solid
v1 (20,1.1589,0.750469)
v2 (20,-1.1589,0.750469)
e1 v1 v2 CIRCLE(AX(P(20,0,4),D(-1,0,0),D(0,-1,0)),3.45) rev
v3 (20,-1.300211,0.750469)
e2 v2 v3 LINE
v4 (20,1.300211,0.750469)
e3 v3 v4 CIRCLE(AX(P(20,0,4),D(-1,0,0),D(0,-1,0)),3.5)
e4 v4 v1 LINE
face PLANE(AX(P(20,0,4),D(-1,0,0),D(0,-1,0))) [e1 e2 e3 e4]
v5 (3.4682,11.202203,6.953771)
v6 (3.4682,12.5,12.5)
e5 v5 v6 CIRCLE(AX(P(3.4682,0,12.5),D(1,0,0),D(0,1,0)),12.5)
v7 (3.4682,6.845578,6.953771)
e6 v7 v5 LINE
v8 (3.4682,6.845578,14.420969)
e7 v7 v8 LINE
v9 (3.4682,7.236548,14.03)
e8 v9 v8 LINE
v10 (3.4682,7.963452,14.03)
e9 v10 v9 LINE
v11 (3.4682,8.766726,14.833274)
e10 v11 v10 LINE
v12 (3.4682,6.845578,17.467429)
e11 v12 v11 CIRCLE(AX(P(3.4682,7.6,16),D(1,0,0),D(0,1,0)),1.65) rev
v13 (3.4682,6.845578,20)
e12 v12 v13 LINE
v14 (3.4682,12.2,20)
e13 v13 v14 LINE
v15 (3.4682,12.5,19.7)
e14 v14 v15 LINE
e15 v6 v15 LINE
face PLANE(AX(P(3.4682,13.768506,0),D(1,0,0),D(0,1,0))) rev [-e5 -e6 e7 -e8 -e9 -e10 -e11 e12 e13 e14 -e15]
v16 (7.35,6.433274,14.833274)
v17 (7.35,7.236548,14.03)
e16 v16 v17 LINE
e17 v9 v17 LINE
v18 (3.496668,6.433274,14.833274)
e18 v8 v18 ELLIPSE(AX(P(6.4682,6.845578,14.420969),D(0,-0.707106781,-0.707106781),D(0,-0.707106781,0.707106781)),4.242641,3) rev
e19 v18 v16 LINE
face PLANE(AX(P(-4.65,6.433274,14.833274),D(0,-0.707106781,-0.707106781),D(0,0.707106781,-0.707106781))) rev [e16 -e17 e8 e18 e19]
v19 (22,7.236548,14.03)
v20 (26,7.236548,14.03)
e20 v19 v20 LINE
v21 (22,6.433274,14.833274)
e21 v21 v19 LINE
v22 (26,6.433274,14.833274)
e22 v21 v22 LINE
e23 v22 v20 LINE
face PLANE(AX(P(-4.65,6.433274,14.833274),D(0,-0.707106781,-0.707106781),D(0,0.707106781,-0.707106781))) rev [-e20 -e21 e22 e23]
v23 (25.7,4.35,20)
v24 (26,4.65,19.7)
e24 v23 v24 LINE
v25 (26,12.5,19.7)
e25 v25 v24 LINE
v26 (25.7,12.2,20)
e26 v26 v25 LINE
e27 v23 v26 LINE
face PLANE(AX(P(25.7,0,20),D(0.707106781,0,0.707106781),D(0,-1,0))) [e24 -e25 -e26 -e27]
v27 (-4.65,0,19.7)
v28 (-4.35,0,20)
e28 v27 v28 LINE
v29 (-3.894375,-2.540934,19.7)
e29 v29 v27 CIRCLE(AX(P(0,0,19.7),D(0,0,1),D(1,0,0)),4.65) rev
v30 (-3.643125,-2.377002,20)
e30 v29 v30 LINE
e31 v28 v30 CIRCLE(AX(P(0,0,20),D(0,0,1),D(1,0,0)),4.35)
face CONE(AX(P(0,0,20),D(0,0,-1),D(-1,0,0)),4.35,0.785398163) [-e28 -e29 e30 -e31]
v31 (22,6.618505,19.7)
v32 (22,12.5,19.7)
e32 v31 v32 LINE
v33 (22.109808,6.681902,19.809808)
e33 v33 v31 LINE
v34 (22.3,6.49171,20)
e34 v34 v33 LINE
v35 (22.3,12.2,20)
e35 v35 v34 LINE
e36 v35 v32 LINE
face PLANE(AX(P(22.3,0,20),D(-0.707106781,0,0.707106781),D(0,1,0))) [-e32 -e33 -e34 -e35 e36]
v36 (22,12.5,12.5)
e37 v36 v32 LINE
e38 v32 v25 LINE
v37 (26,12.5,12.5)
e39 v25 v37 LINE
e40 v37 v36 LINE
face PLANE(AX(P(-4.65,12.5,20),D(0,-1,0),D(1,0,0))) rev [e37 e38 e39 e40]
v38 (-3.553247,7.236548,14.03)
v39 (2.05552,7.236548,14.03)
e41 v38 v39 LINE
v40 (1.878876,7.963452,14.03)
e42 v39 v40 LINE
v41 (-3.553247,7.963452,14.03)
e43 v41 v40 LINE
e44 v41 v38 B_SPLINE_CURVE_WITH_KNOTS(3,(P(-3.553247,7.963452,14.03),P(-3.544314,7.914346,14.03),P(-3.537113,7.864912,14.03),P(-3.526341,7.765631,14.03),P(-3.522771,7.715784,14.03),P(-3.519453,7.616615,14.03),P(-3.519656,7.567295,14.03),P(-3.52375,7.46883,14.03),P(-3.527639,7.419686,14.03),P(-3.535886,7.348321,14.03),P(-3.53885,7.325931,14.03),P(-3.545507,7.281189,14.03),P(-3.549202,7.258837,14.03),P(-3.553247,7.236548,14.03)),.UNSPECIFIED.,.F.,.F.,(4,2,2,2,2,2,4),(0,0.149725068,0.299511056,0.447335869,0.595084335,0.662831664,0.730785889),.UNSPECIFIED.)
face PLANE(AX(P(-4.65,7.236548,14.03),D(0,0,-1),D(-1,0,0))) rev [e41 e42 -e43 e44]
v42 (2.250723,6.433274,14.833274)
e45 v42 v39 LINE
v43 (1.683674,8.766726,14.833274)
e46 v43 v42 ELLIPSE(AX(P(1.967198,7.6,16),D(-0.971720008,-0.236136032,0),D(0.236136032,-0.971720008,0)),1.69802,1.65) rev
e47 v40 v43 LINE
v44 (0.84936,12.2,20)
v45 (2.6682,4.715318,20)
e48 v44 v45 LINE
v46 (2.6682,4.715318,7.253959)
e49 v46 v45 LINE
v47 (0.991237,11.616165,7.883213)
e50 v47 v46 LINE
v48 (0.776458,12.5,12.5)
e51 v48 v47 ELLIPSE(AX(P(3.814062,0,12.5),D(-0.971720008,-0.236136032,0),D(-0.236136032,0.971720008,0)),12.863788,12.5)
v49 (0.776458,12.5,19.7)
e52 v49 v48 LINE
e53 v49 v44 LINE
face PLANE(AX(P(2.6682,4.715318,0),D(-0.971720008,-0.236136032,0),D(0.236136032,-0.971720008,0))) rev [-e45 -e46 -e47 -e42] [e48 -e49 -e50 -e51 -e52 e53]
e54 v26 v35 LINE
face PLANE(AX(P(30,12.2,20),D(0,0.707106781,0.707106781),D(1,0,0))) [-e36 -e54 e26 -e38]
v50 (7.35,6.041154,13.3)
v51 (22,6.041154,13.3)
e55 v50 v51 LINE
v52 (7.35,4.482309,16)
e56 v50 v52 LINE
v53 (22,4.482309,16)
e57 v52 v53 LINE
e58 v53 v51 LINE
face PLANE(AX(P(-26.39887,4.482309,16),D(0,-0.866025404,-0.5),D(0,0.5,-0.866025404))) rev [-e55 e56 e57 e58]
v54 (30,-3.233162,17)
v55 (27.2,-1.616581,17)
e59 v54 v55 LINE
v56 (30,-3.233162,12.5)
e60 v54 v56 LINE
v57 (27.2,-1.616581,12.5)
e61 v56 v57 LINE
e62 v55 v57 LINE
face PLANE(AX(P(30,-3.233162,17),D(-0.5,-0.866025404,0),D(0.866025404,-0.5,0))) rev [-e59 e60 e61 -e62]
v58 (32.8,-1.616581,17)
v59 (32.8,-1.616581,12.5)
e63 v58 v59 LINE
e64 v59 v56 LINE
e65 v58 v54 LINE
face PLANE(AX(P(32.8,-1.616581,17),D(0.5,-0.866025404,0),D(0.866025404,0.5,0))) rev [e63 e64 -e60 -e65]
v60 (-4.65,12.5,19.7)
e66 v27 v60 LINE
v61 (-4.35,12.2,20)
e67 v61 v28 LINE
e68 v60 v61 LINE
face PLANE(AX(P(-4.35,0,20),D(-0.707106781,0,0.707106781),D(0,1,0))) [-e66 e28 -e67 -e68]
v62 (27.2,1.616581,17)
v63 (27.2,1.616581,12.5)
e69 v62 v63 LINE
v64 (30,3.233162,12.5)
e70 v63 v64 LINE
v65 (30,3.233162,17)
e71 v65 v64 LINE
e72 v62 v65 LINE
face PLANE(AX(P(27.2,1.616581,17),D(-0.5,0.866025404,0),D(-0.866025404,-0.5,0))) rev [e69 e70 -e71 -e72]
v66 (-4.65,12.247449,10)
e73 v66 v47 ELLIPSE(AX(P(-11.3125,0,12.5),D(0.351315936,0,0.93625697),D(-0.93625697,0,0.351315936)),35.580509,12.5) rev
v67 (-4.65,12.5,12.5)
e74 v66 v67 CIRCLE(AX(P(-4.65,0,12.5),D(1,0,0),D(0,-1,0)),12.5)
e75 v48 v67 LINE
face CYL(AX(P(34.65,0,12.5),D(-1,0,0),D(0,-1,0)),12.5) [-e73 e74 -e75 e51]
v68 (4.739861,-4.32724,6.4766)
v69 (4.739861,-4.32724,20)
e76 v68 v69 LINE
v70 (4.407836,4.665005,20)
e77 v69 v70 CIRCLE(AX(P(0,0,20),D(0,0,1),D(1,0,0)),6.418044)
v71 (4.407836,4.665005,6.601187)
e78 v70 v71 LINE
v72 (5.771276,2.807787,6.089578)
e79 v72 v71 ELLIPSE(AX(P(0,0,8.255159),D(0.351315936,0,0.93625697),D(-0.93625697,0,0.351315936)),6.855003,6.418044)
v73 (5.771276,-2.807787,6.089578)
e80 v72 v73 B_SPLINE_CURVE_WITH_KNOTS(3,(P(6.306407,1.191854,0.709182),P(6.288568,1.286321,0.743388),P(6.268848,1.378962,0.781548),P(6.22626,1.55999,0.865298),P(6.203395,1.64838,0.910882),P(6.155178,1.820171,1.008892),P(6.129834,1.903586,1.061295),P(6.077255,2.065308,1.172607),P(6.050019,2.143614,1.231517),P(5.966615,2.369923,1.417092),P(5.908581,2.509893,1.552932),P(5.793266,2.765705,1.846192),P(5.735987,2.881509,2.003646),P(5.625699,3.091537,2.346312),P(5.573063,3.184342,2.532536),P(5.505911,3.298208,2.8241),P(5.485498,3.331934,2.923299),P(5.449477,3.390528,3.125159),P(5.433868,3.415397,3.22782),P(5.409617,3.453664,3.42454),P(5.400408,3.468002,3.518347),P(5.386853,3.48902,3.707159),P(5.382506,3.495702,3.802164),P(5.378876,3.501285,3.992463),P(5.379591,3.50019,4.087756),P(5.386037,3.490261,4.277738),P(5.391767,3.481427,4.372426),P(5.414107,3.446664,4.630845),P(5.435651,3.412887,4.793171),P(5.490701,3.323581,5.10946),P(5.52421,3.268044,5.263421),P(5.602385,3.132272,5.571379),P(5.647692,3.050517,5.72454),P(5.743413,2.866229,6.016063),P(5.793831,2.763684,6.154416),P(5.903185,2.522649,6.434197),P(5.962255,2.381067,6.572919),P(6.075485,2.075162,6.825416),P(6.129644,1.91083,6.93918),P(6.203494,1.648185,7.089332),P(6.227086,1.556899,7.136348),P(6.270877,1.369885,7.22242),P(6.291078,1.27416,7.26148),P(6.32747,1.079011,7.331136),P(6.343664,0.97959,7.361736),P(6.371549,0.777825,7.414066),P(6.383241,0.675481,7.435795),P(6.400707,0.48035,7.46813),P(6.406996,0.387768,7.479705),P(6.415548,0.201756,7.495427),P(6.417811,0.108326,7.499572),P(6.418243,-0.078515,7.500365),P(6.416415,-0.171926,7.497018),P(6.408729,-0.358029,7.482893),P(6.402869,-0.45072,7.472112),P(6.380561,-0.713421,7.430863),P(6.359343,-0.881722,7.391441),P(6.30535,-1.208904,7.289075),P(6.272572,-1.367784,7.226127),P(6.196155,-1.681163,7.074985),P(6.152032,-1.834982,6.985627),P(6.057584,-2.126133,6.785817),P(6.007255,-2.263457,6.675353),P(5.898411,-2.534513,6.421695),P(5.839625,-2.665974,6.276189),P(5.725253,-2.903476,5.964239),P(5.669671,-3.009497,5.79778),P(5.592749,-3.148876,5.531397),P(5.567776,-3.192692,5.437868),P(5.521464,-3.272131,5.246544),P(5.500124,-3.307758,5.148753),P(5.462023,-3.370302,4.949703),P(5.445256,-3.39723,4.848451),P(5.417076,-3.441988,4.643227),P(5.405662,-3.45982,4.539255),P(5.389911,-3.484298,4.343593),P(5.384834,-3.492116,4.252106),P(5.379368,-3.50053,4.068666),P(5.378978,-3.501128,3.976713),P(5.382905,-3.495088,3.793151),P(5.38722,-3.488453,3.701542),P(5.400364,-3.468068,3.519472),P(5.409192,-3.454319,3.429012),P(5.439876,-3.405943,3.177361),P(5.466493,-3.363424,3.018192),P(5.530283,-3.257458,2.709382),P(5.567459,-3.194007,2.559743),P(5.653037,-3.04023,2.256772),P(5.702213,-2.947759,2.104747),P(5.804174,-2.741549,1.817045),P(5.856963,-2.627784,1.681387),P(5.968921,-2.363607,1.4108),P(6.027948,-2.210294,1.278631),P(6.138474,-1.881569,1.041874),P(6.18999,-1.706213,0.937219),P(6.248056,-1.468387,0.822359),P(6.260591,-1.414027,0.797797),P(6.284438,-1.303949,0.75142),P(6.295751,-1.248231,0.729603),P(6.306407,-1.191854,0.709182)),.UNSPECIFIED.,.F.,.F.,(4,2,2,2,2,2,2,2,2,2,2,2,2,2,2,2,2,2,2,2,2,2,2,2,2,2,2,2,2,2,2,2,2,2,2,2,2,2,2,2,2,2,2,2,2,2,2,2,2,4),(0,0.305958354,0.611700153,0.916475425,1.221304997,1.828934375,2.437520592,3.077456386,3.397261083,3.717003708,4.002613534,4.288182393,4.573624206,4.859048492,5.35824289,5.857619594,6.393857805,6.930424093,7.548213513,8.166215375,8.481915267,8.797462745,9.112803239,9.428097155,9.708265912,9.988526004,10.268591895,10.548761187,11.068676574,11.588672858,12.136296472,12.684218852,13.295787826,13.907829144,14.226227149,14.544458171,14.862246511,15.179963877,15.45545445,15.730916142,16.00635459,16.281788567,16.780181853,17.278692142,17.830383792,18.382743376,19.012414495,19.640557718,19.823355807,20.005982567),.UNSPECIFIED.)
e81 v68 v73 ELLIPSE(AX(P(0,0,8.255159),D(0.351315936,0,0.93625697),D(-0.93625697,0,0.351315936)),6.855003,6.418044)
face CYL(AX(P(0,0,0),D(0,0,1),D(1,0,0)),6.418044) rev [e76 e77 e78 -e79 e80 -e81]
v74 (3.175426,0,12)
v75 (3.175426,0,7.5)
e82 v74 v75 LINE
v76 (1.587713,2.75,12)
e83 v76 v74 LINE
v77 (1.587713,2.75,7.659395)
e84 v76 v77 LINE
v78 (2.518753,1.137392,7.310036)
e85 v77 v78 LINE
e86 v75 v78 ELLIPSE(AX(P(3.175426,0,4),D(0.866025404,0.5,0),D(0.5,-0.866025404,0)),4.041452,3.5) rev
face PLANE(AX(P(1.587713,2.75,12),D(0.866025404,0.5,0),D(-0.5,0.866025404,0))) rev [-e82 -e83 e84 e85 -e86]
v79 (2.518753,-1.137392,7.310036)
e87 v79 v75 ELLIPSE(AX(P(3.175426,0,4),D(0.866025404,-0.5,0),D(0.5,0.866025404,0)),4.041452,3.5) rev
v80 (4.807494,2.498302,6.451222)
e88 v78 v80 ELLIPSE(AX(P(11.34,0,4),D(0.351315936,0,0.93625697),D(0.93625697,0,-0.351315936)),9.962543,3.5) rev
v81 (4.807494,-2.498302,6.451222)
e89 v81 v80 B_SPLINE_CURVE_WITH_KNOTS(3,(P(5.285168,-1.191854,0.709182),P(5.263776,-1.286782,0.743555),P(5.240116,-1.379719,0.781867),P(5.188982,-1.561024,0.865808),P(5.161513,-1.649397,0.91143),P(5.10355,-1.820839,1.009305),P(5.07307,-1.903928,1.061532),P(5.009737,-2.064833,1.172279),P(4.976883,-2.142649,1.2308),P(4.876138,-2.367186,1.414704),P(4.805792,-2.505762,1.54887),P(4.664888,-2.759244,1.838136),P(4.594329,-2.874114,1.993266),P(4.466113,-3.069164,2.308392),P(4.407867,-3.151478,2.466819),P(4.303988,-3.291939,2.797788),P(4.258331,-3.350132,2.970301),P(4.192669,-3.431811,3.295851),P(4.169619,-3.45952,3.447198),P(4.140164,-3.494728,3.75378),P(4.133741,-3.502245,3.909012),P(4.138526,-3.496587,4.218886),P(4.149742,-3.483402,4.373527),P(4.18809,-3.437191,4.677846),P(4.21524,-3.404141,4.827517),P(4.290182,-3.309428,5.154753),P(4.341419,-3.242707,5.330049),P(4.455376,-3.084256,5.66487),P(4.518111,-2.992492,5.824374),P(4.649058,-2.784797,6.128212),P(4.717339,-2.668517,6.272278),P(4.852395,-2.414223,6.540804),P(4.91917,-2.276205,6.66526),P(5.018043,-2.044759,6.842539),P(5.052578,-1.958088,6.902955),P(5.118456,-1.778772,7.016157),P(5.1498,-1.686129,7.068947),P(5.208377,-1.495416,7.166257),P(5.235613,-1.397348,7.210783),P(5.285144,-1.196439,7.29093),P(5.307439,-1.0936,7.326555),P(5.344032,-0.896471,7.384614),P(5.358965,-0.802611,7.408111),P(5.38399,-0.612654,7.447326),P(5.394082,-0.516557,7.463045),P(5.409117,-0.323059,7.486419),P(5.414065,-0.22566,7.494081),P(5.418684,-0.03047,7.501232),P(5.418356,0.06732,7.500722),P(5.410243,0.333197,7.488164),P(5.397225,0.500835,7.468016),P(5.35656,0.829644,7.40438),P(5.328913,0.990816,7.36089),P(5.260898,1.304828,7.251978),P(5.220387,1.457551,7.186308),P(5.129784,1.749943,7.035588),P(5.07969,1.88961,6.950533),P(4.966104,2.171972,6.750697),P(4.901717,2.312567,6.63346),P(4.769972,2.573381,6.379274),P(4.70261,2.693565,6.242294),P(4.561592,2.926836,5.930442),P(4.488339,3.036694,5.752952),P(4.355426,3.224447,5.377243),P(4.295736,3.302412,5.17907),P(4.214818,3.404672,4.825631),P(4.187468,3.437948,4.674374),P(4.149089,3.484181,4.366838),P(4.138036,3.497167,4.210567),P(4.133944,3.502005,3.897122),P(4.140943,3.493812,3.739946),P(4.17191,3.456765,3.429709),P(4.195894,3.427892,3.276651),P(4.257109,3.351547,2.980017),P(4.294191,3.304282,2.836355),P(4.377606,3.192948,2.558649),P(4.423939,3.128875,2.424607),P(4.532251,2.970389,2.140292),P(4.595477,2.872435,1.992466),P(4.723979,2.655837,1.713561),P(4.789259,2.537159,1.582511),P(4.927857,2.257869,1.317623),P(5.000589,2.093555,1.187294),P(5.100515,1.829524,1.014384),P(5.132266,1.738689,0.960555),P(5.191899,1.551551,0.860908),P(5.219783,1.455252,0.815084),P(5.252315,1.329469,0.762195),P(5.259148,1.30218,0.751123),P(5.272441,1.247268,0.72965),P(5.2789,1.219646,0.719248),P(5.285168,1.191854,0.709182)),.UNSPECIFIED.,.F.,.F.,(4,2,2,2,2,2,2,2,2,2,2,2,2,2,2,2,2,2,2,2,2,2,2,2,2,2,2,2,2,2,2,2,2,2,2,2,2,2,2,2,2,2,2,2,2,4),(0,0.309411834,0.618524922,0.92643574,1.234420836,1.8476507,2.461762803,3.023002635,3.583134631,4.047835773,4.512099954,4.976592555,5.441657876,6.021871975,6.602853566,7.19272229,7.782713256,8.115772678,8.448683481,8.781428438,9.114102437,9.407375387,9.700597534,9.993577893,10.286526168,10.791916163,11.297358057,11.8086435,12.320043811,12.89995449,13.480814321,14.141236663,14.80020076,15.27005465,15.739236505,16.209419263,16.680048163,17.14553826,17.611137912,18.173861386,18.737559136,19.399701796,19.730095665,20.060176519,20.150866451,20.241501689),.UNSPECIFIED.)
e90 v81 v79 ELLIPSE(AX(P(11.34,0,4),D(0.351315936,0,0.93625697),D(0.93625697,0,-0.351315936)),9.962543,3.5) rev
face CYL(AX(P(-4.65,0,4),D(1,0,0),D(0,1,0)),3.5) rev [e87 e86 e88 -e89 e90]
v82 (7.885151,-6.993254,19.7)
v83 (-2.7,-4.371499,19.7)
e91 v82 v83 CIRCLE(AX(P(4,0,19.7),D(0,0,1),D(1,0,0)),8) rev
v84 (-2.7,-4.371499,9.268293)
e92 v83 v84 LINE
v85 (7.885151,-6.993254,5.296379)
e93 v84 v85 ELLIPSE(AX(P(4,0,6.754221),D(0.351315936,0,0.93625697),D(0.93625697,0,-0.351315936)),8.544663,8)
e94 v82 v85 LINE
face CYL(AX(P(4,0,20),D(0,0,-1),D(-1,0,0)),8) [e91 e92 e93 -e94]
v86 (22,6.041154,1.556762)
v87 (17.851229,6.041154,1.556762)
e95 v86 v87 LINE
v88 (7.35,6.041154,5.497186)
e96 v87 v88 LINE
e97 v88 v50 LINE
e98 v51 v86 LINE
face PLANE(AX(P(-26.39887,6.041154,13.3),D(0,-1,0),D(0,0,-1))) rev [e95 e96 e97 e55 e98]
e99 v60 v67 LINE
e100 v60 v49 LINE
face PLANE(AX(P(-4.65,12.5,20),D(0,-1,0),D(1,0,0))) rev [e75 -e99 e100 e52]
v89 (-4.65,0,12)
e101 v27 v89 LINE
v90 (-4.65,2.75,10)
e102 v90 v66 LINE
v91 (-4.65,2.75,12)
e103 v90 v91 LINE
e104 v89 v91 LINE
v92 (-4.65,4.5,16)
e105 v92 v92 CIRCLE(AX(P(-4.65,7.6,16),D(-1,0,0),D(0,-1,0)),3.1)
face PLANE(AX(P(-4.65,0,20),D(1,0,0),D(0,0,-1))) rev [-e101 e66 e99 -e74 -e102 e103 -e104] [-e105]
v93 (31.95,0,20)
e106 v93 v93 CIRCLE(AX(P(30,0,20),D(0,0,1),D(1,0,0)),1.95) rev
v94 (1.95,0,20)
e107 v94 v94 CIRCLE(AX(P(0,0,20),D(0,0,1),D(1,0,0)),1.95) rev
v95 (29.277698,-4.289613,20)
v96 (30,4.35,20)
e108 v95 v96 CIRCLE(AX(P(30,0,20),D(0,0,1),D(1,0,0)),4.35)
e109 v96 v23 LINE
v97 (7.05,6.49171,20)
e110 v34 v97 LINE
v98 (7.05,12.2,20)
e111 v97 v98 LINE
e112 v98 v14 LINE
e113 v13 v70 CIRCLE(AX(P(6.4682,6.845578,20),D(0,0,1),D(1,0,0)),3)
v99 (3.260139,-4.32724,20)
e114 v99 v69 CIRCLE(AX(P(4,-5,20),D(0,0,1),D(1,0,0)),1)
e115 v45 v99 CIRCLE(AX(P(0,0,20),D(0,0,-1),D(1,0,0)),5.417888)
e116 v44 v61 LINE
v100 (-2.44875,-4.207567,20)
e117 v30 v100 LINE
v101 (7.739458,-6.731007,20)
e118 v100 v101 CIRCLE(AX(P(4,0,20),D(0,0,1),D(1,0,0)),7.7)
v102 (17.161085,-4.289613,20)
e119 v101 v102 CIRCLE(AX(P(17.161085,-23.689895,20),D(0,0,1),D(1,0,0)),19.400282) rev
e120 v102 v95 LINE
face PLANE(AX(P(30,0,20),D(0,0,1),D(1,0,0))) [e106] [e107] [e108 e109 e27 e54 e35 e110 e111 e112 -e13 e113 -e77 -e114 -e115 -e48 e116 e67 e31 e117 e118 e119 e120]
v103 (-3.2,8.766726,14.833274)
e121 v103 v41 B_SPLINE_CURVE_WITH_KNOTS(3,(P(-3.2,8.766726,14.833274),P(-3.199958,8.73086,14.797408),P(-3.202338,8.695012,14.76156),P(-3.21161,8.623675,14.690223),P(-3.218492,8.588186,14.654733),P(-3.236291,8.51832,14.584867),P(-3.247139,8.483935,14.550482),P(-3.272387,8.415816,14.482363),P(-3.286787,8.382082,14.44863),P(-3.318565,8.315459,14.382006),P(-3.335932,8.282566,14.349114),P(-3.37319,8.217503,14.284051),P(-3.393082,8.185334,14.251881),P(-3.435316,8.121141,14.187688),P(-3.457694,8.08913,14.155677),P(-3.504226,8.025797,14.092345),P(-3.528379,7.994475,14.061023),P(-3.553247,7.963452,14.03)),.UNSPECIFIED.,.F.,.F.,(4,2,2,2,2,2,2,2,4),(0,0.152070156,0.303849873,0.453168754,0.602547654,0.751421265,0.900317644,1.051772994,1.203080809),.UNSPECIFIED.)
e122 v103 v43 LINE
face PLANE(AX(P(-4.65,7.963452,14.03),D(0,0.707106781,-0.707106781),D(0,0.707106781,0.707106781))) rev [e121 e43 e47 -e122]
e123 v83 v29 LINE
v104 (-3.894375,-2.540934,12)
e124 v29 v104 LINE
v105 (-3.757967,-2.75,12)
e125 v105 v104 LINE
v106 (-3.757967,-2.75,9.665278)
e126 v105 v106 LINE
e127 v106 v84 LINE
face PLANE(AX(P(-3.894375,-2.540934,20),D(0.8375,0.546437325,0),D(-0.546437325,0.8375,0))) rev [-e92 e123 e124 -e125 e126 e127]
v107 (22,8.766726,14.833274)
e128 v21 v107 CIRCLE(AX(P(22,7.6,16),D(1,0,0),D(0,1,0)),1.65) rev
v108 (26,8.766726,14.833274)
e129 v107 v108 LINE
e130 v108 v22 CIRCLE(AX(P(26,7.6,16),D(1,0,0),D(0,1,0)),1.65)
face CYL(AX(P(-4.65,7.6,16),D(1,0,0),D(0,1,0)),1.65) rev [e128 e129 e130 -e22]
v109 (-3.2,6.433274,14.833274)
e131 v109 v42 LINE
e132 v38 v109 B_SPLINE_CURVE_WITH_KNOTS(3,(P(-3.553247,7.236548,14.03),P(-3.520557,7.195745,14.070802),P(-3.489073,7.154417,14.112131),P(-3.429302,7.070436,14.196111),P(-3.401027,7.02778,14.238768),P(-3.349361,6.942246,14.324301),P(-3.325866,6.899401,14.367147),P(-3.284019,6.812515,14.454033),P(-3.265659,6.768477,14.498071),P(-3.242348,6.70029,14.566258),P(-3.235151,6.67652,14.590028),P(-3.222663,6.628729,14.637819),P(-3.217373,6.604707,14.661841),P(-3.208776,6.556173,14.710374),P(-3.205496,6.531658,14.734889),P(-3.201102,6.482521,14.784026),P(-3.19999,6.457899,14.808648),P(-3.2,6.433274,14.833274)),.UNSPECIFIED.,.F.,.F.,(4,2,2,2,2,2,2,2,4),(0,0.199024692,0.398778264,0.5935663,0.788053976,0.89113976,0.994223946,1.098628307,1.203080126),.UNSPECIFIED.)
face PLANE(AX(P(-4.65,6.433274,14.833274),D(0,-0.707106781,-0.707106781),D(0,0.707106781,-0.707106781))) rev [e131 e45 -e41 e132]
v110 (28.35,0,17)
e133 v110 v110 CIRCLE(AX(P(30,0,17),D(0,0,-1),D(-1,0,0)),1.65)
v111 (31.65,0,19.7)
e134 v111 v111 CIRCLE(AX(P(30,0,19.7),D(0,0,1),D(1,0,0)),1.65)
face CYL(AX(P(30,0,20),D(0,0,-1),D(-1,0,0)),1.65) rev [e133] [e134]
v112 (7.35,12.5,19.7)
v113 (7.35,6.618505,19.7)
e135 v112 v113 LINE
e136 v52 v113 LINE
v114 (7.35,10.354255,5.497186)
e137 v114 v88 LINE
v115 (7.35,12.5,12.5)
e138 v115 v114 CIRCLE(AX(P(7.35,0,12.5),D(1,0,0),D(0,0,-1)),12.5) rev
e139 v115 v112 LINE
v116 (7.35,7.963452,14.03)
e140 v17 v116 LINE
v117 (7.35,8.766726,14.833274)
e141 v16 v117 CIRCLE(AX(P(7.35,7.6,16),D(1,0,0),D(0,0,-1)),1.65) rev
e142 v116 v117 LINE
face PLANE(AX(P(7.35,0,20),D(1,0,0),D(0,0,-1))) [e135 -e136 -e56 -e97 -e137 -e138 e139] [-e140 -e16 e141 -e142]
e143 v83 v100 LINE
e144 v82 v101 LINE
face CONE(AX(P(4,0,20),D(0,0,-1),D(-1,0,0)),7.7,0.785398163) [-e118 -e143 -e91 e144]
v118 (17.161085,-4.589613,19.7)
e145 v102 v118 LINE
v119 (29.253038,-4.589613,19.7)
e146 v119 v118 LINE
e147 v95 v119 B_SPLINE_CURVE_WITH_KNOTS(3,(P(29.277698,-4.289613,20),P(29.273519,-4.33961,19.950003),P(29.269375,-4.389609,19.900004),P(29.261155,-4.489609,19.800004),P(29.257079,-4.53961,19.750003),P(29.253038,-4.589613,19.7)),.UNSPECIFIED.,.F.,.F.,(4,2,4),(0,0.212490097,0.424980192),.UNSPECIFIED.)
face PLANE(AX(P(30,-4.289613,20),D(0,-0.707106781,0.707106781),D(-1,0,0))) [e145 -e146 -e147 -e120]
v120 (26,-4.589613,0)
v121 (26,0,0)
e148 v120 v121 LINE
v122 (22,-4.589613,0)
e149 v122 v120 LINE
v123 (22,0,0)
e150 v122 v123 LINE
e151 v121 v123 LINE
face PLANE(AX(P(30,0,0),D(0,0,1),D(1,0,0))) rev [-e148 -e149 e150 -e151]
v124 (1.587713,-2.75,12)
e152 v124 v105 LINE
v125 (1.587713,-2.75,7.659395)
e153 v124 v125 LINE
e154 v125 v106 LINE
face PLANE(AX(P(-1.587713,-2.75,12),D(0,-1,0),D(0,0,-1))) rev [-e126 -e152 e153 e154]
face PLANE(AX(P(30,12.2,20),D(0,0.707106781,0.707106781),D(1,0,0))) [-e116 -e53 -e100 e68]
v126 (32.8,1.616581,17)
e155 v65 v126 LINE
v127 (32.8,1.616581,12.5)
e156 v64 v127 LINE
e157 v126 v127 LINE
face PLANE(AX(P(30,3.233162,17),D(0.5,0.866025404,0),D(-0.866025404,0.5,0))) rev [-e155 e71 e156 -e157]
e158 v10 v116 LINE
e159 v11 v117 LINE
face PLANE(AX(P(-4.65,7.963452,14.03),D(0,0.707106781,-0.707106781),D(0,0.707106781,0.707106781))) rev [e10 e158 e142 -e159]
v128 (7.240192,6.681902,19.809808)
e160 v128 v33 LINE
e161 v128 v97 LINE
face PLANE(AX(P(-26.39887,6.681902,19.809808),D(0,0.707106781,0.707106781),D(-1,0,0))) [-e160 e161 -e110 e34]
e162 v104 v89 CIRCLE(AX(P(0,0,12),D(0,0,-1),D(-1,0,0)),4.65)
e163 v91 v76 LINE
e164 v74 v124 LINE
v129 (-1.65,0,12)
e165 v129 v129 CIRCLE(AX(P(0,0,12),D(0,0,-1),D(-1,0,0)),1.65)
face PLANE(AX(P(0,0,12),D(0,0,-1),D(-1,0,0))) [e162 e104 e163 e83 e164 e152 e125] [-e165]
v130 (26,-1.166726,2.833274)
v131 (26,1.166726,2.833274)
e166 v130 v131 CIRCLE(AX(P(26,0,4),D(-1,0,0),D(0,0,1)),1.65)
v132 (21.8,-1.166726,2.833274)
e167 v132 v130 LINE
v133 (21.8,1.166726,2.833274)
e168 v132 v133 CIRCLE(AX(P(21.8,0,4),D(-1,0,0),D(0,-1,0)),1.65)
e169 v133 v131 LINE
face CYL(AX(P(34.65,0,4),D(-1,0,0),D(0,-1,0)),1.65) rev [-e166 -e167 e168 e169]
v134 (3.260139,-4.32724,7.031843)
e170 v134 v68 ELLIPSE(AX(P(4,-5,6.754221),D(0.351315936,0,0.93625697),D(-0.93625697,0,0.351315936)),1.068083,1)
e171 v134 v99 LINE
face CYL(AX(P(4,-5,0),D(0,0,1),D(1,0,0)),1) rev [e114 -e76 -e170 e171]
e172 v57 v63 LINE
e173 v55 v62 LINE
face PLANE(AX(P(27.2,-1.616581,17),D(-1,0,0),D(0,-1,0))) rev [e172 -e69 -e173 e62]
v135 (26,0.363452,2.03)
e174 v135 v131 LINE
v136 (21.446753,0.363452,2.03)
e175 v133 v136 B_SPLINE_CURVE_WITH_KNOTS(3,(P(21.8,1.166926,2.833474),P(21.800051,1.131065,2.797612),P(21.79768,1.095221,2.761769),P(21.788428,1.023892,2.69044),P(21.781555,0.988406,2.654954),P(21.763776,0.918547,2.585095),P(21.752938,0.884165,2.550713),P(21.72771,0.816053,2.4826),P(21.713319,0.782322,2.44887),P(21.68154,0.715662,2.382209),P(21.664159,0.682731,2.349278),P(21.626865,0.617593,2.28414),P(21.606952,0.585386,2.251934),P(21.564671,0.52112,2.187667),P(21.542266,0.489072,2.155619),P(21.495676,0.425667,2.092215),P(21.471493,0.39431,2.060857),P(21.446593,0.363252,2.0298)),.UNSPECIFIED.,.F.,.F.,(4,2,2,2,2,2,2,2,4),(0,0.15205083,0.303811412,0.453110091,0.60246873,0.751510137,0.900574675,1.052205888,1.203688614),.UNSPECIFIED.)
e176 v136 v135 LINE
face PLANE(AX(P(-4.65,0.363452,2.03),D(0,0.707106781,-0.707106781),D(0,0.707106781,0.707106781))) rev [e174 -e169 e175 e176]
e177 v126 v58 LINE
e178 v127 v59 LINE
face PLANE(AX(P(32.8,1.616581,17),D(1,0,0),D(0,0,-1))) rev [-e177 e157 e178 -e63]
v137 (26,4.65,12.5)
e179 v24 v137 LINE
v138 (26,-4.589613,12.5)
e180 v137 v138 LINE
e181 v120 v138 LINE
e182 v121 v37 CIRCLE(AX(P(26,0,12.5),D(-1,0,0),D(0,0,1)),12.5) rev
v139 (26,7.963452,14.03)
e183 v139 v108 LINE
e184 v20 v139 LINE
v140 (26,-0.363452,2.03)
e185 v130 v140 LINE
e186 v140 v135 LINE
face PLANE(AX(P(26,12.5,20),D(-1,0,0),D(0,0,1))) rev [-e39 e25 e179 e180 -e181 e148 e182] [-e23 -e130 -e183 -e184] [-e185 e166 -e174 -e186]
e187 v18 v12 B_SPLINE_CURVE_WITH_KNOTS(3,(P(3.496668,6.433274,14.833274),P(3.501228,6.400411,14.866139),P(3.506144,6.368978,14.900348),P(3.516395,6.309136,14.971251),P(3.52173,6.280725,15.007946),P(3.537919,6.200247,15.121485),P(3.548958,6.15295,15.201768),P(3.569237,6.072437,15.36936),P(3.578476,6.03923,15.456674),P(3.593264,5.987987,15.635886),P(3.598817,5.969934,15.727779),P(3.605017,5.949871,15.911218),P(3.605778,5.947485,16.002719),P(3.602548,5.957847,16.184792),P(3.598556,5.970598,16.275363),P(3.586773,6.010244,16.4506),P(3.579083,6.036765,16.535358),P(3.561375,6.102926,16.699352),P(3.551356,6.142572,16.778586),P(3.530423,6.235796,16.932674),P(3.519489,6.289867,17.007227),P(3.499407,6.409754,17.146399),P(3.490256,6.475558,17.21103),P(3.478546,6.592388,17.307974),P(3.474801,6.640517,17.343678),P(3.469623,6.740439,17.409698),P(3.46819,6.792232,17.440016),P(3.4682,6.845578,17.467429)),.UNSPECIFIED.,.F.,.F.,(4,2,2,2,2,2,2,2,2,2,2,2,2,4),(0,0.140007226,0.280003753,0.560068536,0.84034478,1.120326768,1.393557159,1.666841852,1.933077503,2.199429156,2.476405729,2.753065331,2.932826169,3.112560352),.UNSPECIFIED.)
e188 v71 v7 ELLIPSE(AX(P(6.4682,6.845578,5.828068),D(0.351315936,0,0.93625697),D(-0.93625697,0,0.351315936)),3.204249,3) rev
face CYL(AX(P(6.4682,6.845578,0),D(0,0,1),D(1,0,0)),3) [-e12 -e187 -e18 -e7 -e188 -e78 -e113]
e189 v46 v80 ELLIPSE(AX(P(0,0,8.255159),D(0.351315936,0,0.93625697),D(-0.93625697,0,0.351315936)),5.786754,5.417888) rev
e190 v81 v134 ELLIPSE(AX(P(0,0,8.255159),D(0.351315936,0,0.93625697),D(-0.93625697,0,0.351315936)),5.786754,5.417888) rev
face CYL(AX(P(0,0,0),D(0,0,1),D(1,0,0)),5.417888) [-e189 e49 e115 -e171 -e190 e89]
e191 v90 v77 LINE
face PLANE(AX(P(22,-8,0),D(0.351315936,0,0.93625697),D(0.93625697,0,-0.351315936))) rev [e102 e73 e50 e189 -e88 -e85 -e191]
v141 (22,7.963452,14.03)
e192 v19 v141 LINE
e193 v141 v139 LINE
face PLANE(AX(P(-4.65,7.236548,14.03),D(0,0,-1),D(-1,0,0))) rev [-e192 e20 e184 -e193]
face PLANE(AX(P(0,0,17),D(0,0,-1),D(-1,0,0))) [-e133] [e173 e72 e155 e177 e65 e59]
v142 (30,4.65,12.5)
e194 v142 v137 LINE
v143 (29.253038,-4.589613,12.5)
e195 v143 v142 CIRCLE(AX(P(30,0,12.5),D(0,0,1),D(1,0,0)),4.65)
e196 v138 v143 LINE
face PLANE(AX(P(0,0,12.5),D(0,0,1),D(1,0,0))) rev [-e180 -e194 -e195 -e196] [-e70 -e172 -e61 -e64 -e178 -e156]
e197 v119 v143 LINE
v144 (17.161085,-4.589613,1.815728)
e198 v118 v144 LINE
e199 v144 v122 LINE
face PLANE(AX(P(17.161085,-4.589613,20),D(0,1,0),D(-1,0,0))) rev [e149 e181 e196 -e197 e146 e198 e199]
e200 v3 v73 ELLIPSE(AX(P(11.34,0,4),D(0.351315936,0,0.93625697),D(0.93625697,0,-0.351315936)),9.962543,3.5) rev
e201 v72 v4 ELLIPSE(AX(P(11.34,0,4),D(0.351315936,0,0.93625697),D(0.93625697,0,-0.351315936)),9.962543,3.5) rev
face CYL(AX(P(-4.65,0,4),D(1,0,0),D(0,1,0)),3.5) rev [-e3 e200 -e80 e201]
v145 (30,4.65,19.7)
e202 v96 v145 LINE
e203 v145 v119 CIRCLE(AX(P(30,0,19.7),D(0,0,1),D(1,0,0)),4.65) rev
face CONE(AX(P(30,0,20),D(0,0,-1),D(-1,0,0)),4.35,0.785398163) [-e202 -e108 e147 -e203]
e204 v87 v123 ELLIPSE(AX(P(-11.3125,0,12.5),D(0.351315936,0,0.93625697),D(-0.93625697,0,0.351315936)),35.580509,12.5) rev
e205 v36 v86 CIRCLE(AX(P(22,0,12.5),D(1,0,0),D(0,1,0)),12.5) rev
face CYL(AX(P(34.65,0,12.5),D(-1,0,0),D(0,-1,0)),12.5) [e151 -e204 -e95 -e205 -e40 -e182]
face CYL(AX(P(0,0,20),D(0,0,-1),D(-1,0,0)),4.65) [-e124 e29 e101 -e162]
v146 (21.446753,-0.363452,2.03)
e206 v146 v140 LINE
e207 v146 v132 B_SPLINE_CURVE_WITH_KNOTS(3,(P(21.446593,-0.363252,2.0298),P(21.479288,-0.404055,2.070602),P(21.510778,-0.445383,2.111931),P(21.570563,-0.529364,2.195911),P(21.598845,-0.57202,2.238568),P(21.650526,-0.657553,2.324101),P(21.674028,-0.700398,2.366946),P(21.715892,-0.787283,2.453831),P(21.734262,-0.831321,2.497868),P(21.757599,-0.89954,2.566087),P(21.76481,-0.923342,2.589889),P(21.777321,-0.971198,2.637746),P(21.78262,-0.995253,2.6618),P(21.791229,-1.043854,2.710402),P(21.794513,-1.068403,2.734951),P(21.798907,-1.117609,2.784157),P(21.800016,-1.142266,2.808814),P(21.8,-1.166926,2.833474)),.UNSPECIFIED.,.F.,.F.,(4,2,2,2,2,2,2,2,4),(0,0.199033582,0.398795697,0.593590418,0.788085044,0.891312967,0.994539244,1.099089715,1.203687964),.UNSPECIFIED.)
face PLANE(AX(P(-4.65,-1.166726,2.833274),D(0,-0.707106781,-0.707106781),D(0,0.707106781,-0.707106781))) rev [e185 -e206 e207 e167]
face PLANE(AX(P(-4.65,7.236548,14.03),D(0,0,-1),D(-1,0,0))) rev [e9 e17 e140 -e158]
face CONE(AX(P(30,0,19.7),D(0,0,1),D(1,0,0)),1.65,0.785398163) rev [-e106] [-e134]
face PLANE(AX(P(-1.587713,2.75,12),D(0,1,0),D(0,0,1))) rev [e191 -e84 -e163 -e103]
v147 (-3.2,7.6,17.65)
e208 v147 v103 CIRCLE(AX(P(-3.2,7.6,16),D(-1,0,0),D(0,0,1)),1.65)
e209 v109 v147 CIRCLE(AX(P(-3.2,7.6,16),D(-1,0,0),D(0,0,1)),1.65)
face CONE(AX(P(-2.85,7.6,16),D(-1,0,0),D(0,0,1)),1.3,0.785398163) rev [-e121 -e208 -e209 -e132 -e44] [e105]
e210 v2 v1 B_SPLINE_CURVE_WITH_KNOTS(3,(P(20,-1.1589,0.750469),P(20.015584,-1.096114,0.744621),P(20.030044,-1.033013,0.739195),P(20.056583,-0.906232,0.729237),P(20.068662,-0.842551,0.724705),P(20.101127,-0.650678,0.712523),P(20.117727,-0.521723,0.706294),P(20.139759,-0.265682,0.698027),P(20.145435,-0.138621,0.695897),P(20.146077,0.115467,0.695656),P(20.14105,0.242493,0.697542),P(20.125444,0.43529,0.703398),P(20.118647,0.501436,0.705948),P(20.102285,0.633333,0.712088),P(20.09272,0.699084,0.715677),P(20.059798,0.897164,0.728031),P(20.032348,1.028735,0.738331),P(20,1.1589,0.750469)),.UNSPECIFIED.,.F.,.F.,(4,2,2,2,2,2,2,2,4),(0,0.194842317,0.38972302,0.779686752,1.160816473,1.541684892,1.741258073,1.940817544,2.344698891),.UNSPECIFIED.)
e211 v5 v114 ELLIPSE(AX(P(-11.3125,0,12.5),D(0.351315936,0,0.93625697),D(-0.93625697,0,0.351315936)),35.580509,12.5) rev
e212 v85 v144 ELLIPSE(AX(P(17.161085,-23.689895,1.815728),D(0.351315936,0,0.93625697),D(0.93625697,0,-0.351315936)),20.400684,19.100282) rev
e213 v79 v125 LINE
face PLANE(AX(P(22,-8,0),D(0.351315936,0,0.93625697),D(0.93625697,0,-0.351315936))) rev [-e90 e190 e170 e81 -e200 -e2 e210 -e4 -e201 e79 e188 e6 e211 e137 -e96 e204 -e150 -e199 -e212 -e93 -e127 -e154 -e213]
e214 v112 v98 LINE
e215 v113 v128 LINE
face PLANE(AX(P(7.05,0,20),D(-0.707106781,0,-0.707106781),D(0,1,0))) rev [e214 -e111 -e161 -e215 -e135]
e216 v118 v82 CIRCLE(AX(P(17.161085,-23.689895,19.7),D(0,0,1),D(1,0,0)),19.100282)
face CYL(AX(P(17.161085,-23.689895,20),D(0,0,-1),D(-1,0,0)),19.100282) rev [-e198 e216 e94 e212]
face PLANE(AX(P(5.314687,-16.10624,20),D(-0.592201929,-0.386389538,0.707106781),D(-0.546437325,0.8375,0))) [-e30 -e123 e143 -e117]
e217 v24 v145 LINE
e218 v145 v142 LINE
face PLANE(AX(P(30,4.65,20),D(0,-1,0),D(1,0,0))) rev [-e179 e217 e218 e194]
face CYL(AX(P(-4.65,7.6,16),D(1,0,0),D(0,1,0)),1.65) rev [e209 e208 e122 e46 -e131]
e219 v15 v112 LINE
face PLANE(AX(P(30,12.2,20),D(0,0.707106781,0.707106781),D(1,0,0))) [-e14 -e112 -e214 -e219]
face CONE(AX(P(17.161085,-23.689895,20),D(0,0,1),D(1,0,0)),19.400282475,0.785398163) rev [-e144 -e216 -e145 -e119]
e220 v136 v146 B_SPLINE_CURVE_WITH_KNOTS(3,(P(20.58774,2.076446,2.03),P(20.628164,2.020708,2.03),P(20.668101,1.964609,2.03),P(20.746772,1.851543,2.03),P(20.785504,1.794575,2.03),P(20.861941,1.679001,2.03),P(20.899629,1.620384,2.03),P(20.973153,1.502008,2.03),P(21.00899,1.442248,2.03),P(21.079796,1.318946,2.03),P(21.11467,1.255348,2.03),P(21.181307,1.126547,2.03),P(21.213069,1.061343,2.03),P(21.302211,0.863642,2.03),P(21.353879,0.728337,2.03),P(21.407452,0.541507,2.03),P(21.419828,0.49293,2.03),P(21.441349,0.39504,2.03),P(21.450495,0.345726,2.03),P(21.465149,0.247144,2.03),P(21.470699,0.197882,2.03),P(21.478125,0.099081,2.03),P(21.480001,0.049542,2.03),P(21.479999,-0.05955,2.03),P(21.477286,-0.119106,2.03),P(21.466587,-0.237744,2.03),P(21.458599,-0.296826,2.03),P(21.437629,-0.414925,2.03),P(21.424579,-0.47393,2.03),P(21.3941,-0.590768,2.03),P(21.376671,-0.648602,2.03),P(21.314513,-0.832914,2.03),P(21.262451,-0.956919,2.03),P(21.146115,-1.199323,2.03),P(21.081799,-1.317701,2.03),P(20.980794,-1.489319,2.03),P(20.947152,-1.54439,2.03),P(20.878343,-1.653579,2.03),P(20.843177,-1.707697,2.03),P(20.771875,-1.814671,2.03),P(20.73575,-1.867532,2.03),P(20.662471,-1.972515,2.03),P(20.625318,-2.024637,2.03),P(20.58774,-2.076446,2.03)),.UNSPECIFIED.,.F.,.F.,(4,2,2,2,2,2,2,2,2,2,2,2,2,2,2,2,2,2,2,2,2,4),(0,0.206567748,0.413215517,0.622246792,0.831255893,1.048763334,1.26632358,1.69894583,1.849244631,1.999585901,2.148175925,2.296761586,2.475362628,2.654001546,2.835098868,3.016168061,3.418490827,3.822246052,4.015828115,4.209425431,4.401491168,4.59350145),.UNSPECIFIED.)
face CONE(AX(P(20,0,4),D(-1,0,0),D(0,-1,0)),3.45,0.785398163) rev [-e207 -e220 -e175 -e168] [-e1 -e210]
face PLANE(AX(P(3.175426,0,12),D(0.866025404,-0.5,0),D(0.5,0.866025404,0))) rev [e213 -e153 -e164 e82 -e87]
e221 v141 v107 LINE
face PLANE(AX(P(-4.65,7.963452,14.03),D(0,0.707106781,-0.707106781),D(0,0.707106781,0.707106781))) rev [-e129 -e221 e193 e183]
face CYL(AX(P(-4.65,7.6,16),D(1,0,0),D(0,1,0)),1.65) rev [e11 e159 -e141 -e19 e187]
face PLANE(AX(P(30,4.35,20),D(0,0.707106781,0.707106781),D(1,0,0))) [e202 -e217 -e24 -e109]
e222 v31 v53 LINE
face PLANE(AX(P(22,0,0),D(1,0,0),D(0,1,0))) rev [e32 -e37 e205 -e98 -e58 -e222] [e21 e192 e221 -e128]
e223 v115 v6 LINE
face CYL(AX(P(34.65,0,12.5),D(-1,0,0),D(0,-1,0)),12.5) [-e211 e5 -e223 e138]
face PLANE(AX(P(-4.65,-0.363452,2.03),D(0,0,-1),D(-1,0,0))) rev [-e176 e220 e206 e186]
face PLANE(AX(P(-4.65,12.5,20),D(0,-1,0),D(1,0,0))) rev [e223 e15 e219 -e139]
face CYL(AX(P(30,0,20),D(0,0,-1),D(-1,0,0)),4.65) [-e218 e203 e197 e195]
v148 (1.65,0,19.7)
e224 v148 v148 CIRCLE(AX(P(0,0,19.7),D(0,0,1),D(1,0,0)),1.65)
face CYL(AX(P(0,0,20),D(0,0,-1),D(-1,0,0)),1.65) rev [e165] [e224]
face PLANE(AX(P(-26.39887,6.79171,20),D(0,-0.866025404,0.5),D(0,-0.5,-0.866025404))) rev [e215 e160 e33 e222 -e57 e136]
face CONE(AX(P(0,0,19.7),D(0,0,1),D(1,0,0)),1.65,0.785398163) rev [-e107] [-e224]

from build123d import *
from OCP.BRepFilletAPI import BRepFilletAPI_MakeChamfer

# Parameters (mm, degrees)
SKETCH1_R                = 1.65
BOSS_EXTRUDE1_DEPTH      = 20
SKETCH3_R                = 1.65
CUT_EXTRUDE3_DEPTH       = 39.673925324
CUT_EXTRUDE4_DEPTH       = 12
CUT_EXTRUDE5_START       = -4
CUT_EXTRUDE5_DEPTH       = 14.65
CUT_EXTRUDE11_DEPTH      = 42.915062925
CUT_EXTRUDE11_DEPTH_BACK = 42.915062925
CUT_EXTRUDE10_DEPTH      = 5
CUT_EXTRUDE10_DEPTH_BACK = 39.898875305
SKETCH10_W               = 9.115200733
SKETCH10_H               = 9.576012389
CUT_EXTRUDE7_DEPTH       = 4.5
CUT_EXTRUDE8_DEPTH       = 36.587532929
CUT_EXTRUDE8_DEPTH_BACK  = 36.587532929
SKETCH8_R                = 1.65
CUT_EXTRUDE9_START       = 2
SKETCH9_R                = 3.5
CUT_EXTRUDE9_DEPTH       = 34.587532929
CHAMFER6_SIZE            = 1.8
CUT_EXTRUDE12_DEPTH      = 39.673925324
CHAMFER7_SIZE            = 0.3
CHAMFER7_SIZE2           = 0.219615242
CUT_EXTRUDE13_DEPTH      = 42.915062925
SKETCH14_R               = 3.1
CUT_EXTRUDE14_DEPTH      = 1.8
CHAMFER8_START           = -4.6500001
CHAMFER8_OUTLINE_R       = 3.1
CHAMFER8_DEPTH           = 1.8000001
CHAMFER8_START_2         = -4.65
CHAMFER8_3_DEPTH         = 1.8
FILLET1_R                = 3


with BuildPart() as part:
    # Sketch1 → Boss-Extrude1 (new body)
    with BuildSketch(Plane.XY):
        with BuildLine():
            Line((-3.894375, -2.540933561), (-2.7, -4.371498599))
            ThreePointArc((-2.7, -4.371498599), (2.076657931, -7.765356095), (7.885150706, -6.993254178))
            ThreePointArc((7.885150706, -6.993254178), (12.369935761, -5.200285461), (17.161085198, -4.589612979))
            Line((17.161085198, -4.589612979), (29.253037683, -4.589612979))
            ThreePointArc((29.253037683, -4.589612979), (34.634878658, -0.374699645), (30, 4.65))
            Line((30, 4.65), (26, 4.65))
            Line((26, 4.65), (26, 12.5))
            Line((26, 12.5), (-4.65, 12.5))
            Line((-4.65, 12.5), (-4.65, 0))
            ThreePointArc((-4.65, 0), (-4.457092312, -1.325453932), (-3.894375, -2.540933561))
        make_face()
        Circle(SKETCH1_R, mode=Mode.SUBTRACT)
        with Locations((30, 0)):
            Circle(SKETCH1_R, mode=Mode.SUBTRACT)
    extrude(amount=BOSS_EXTRUDE1_DEPTH)

    # Sketch3 → Cut-Extrude3 (cut, through all)
    with BuildSketch(Plane(origin=(26, 0, 0), x_dir=(0, 0, -1), z_dir=(1, 0, 0))):
        with Locations(Location((-16, 7.6, 0), (0, 0, 90))):
            Circle(SKETCH3_R)
    extrude(amount=-CUT_EXTRUDE3_DEPTH, mode=Mode.SUBTRACT)

    # Sketch4 → Cut-Extrude4 (cut)
    with BuildSketch(Plane(origin=(0, 0, 0), x_dir=(-1, 0, 0), z_dir=(0, 0, -1))):
        Polygon((1.58771324, -2.75), (6.896922601, -2.75), (6.896922601, 2.75), (1.58771324, 2.75), (-1.58771324, 2.75), (-3.175426481, 0), (-1.58771324, -2.75), align=None)
    extrude(amount=-CUT_EXTRUDE4_DEPTH, mode=Mode.SUBTRACT)

    # Sketch5 → Cut-Extrude5 (cut)
    with BuildSketch(Plane(origin=(26, 0, 0), x_dir=(0, 0, -1), z_dir=(1, 0, 0)).offset(CUT_EXTRUDE5_START)):
        Polygon((-13.3, 6.041154273), (0, 6.041154273), (0, 12.5), (-20, 13.02709253), (-20, 6.791709623), (-16, 4.482308546), align=None)
    extrude(amount=-CUT_EXTRUDE5_DEPTH, mode=Mode.SUBTRACT)

    # Sketch11 → Cut-Extrude11 (cut, two sides: drawn at the far end of the back side and taken through both)
    with BuildSketch(Plane(origin=(0, 0, 0), x_dir=(1, 0, 0), z_dir=(0, 1, 0)).offset(-CUT_EXTRUDE11_DEPTH_BACK)):
        Polygon((22, 0), (-4.65, -10), (-4.65, 0), align=None)
    extrude(amount=CUT_EXTRUDE11_DEPTH + CUT_EXTRUDE11_DEPTH_BACK, mode=Mode.SUBTRACT)

    # Sketch10 → Cut-Extrude10 (cut, two sides: drawn at the far end of the back side and taken through both)
    with BuildSketch(Plane.XY.offset(7.5).offset(-CUT_EXTRUDE10_DEPTH_BACK)):
        with Locations((30.557600367, -0.138006194)):
            Rectangle(SKETCH10_W, SKETCH10_H)
    extrude(amount=CUT_EXTRUDE10_DEPTH + CUT_EXTRUDE10_DEPTH_BACK, mode=Mode.SUBTRACT)

    # Sketch7 → Cut-Extrude7 (cut)
    with BuildSketch(Plane(origin=(0, 0, 12.5), x_dir=(-1, 0, 0), z_dir=(0, 0, -1))):
        Polygon((-27.2, -1.616580754), (-27.2, 1.616580754), (-30, 3.233161507), (-32.8, 1.616580754), (-32.8, -1.616580754), (-30, -3.233161507), align=None)
    extrude(amount=-CUT_EXTRUDE7_DEPTH, mode=Mode.SUBTRACT)

    # Sketch8 → Cut-Extrude8 (cut, two sides: drawn at the far end of the back side and taken through both)
    with BuildSketch(Plane.ZY.offset(-22).offset(-CUT_EXTRUDE8_DEPTH_BACK)):
        with Locations((4, 0)):
            Circle(SKETCH8_R)
        with BuildLine():
            Line((12.5, 12.5), (0, 12.5))
            Line((0, 12.5), (0, 0))
            ThreePointArc((0, 0), (3.661165235, 8.838834765), (12.5, 12.5))
        make_face()
    extrude(amount=CUT_EXTRUDE8_DEPTH + CUT_EXTRUDE8_DEPTH_BACK, mode=Mode.SUBTRACT)

    # Sketch9 → Cut-Extrude9 (cut, through all)
    with BuildSketch(Plane.ZY.offset(-22).offset(CUT_EXTRUDE9_START)):
        with Locations((4, 0)):
            Circle(SKETCH9_R)
    extrude(amount=CUT_EXTRUDE9_DEPTH, mode=Mode.SUBTRACT)

    # Chamfer6
    # the kernel refuses this chamfer: 1.8 mm, written as the material it takes off along each edge
    with BuildSketch(Plane(origin=(20, 0, 4), x_dir=(0, 0, 1), z_dir=(0, -1, 0))) as chamfer6_piece_1:
        Polygon((1.65, -CHAMFER6_SIZE), (1.65 + CHAMFER6_SIZE, 0), (1.65, 0), align=None)
    revolve(axis=Axis((20, 0, 4), (-1, 0, 0)), mode=Mode.SUBTRACT)

    # Sketch12 → Cut-Extrude12 (cut, through all)
    with BuildSketch(Plane(origin=(26, 0, 0), x_dir=(0, 0, -1), z_dir=(1, 0, 0))):
        Polygon((-4, 0), (-2.833273811, -1.166726189), (-2.03, -0.363452378), (-2.03, 0.363452378), (-2.833273811, 1.166726189), align=None)
        Polygon((-16, 7.6), (-14.833273811, 6.433273811), (-14.03, 7.236547622), (-14.03, 7.963452378), (-14.833273811, 8.766726189), align=None)
    extrude(amount=-CUT_EXTRUDE12_DEPTH, mode=Mode.SUBTRACT)

    # Chamfer7: one chamfer whose edges measure the first distance from different faces: ONE call of the kernel's chamfer builder (chamfer() names one face for all edges)
    chamfer7_edges_1 = [part.edges().sort_by_distance(p)[0] for p in [
        (-4.457092312, -1.325453932, 20),
        (-3.2971875, -3.45621608, 20),
        (2.076657931, -7.765356095, 20),
        (12.369935761, -5.200285461, 20),
        (23.207061441, -4.589612979, 20),
        (34.634878658, -0.374699645, 20),
        (-1.65, 0, 20),
        (28, 4.65, 20),
        (28.35, 0, 20),
        (26, 8.575, 20),
        (24, 12.5, 20),
        (-4.65, 6.25, 20),
        (1.35, 12.5, 20),
        (22, 9.645854812, 20),
        (7.35, 9.645854812, 20),
    ]]
    chamfer7_edges_2 = [part.edges().sort_by_distance(p)[0] for p in [
        (14.675, 6.791709623, 20),
    ]]
    chamfer7_side_2 = [part.faces().sort_by_distance(p)[0] for p in [
        (12.200528513, 2.041085784, 20),
    ]]
    chamfer7 = BRepFilletAPI_MakeChamfer(part.part.solid().wrapped)
    for e in chamfer7_edges_1:
        chamfer7.Add(CHAMFER7_SIZE, e.wrapped)
    for e in chamfer7_edges_2:
        chamfer7.Add(CHAMFER7_SIZE, CHAMFER7_SIZE2, e.wrapped, chamfer7_side_2[0].wrapped)  # the first distance lies on this face
    add(Compound.cast(chamfer7.Shape()), mode=Mode.REPLACE)

    # Sketch13 → Cut-Extrude13 (cut, through all)
    with BuildSketch(Plane.XY.offset(20)):
        with BuildLine():
            Line((2.668200105, 13.768506402), (3.468200105, 13.768506402))
            Line((3.468200105, 13.768506402), (3.468200105, 5.400266455))
            ThreePointArc((3.468200105, 5.400266455), (6.363895276, 0.831941508), (4.739860969, -4.327240201))
            ThreePointArc((4.739860969, -4.327240201), (4, -6), (3.260139031, -4.327240201))
            ThreePointArc((3.260139031, -4.327240201), (5.406317163, 0.353905339), (2.668200105, 4.715317853))
            Line((2.668200105, 4.715317853), (0.468200105, 13.768506402))
            Line((0.468200105, 13.768506402), (2.668200105, 13.768506402))
        make_face()
    extrude(amount=-CUT_EXTRUDE13_DEPTH, mode=Mode.SUBTRACT)

    # Sketch14 → Cut-Extrude14 (cut)
    with BuildSketch(Plane.ZY.offset(4.65)):
        with Locations(Location((16, 7.6, 0), (0, 0, 270))):
            Circle(SKETCH14_R)
    extrude(amount=-CUT_EXTRUDE14_DEPTH, mode=Mode.SUBTRACT)

    # Chamfer8: read off the stored shape, not the designer's step
    # Chamfer8 outline → Chamfer8 (add)
    with BuildSketch(Plane.YZ.offset(CHAMFER8_START)):
        with Locations((7.6, 16)):
            Circle(CHAMFER8_OUTLINE_R)
    extrude(amount=CHAMFER8_DEPTH)

    # Chamfer8 2 outline → Chamfer8 2 (revolve, cut)
    with BuildSketch(Plane(origin=(0, 7.6, 16), x_dir=(0, 1, 0), z_dir=(0, 0, -1))):
        Polygon((0, -4.65), (3.1, -4.65), (1.64999615, -3.19999615), (0, -3.19999615), align=None)
    revolve(axis=Axis((0, 7.6, 16), (1, 0, 0)), mode=Mode.SUBTRACT)

    # Chamfer8 3 outline → Chamfer8 3 (cut)
    with BuildSketch(Plane.YZ.offset(CHAMFER8_START_2)):
        with BuildLine():
            ThreePointArc((8.766726189, 14.833273811), (7.6, 17.65), (6.433273811, 14.833273811))
            Line((6.433273811, 14.833273811), (7.236547622, 14.03))
            Line((7.236547622, 14.03), (7.963452378, 14.03))
            Line((7.963452378, 14.03), (8.766726189, 14.833273811))
        make_face()
    extrude(amount=CHAMFER8_3_DEPTH, mode=Mode.SUBTRACT)

    # Fillet1
    # the kernel refuses this fillet: 3 mm, written as the material it takes off along each edge
    with BuildSketch(Plane(origin=(3.468200105, 5.400266455, 23.613279493), x_dir=(0.7875480221604082, -0.616253286231586, 0), z_dir=(0, 0, -1))) as fillet1_piece_1:
        with BuildLine():
            CenterArc((1.471965922, -2.987012306), FILLET1_R, 95.333346889, 46.623610266)
            Line((-0.890678145, -1.138252447), (0, 0))
            ThreePointArc((0, 0), (0.596557816, -0.027785198), (1.193115632, 0))
        make_face()
    extrude(amount=20.272787919, mode=Mode.SUBTRACT)


solid = part.part
